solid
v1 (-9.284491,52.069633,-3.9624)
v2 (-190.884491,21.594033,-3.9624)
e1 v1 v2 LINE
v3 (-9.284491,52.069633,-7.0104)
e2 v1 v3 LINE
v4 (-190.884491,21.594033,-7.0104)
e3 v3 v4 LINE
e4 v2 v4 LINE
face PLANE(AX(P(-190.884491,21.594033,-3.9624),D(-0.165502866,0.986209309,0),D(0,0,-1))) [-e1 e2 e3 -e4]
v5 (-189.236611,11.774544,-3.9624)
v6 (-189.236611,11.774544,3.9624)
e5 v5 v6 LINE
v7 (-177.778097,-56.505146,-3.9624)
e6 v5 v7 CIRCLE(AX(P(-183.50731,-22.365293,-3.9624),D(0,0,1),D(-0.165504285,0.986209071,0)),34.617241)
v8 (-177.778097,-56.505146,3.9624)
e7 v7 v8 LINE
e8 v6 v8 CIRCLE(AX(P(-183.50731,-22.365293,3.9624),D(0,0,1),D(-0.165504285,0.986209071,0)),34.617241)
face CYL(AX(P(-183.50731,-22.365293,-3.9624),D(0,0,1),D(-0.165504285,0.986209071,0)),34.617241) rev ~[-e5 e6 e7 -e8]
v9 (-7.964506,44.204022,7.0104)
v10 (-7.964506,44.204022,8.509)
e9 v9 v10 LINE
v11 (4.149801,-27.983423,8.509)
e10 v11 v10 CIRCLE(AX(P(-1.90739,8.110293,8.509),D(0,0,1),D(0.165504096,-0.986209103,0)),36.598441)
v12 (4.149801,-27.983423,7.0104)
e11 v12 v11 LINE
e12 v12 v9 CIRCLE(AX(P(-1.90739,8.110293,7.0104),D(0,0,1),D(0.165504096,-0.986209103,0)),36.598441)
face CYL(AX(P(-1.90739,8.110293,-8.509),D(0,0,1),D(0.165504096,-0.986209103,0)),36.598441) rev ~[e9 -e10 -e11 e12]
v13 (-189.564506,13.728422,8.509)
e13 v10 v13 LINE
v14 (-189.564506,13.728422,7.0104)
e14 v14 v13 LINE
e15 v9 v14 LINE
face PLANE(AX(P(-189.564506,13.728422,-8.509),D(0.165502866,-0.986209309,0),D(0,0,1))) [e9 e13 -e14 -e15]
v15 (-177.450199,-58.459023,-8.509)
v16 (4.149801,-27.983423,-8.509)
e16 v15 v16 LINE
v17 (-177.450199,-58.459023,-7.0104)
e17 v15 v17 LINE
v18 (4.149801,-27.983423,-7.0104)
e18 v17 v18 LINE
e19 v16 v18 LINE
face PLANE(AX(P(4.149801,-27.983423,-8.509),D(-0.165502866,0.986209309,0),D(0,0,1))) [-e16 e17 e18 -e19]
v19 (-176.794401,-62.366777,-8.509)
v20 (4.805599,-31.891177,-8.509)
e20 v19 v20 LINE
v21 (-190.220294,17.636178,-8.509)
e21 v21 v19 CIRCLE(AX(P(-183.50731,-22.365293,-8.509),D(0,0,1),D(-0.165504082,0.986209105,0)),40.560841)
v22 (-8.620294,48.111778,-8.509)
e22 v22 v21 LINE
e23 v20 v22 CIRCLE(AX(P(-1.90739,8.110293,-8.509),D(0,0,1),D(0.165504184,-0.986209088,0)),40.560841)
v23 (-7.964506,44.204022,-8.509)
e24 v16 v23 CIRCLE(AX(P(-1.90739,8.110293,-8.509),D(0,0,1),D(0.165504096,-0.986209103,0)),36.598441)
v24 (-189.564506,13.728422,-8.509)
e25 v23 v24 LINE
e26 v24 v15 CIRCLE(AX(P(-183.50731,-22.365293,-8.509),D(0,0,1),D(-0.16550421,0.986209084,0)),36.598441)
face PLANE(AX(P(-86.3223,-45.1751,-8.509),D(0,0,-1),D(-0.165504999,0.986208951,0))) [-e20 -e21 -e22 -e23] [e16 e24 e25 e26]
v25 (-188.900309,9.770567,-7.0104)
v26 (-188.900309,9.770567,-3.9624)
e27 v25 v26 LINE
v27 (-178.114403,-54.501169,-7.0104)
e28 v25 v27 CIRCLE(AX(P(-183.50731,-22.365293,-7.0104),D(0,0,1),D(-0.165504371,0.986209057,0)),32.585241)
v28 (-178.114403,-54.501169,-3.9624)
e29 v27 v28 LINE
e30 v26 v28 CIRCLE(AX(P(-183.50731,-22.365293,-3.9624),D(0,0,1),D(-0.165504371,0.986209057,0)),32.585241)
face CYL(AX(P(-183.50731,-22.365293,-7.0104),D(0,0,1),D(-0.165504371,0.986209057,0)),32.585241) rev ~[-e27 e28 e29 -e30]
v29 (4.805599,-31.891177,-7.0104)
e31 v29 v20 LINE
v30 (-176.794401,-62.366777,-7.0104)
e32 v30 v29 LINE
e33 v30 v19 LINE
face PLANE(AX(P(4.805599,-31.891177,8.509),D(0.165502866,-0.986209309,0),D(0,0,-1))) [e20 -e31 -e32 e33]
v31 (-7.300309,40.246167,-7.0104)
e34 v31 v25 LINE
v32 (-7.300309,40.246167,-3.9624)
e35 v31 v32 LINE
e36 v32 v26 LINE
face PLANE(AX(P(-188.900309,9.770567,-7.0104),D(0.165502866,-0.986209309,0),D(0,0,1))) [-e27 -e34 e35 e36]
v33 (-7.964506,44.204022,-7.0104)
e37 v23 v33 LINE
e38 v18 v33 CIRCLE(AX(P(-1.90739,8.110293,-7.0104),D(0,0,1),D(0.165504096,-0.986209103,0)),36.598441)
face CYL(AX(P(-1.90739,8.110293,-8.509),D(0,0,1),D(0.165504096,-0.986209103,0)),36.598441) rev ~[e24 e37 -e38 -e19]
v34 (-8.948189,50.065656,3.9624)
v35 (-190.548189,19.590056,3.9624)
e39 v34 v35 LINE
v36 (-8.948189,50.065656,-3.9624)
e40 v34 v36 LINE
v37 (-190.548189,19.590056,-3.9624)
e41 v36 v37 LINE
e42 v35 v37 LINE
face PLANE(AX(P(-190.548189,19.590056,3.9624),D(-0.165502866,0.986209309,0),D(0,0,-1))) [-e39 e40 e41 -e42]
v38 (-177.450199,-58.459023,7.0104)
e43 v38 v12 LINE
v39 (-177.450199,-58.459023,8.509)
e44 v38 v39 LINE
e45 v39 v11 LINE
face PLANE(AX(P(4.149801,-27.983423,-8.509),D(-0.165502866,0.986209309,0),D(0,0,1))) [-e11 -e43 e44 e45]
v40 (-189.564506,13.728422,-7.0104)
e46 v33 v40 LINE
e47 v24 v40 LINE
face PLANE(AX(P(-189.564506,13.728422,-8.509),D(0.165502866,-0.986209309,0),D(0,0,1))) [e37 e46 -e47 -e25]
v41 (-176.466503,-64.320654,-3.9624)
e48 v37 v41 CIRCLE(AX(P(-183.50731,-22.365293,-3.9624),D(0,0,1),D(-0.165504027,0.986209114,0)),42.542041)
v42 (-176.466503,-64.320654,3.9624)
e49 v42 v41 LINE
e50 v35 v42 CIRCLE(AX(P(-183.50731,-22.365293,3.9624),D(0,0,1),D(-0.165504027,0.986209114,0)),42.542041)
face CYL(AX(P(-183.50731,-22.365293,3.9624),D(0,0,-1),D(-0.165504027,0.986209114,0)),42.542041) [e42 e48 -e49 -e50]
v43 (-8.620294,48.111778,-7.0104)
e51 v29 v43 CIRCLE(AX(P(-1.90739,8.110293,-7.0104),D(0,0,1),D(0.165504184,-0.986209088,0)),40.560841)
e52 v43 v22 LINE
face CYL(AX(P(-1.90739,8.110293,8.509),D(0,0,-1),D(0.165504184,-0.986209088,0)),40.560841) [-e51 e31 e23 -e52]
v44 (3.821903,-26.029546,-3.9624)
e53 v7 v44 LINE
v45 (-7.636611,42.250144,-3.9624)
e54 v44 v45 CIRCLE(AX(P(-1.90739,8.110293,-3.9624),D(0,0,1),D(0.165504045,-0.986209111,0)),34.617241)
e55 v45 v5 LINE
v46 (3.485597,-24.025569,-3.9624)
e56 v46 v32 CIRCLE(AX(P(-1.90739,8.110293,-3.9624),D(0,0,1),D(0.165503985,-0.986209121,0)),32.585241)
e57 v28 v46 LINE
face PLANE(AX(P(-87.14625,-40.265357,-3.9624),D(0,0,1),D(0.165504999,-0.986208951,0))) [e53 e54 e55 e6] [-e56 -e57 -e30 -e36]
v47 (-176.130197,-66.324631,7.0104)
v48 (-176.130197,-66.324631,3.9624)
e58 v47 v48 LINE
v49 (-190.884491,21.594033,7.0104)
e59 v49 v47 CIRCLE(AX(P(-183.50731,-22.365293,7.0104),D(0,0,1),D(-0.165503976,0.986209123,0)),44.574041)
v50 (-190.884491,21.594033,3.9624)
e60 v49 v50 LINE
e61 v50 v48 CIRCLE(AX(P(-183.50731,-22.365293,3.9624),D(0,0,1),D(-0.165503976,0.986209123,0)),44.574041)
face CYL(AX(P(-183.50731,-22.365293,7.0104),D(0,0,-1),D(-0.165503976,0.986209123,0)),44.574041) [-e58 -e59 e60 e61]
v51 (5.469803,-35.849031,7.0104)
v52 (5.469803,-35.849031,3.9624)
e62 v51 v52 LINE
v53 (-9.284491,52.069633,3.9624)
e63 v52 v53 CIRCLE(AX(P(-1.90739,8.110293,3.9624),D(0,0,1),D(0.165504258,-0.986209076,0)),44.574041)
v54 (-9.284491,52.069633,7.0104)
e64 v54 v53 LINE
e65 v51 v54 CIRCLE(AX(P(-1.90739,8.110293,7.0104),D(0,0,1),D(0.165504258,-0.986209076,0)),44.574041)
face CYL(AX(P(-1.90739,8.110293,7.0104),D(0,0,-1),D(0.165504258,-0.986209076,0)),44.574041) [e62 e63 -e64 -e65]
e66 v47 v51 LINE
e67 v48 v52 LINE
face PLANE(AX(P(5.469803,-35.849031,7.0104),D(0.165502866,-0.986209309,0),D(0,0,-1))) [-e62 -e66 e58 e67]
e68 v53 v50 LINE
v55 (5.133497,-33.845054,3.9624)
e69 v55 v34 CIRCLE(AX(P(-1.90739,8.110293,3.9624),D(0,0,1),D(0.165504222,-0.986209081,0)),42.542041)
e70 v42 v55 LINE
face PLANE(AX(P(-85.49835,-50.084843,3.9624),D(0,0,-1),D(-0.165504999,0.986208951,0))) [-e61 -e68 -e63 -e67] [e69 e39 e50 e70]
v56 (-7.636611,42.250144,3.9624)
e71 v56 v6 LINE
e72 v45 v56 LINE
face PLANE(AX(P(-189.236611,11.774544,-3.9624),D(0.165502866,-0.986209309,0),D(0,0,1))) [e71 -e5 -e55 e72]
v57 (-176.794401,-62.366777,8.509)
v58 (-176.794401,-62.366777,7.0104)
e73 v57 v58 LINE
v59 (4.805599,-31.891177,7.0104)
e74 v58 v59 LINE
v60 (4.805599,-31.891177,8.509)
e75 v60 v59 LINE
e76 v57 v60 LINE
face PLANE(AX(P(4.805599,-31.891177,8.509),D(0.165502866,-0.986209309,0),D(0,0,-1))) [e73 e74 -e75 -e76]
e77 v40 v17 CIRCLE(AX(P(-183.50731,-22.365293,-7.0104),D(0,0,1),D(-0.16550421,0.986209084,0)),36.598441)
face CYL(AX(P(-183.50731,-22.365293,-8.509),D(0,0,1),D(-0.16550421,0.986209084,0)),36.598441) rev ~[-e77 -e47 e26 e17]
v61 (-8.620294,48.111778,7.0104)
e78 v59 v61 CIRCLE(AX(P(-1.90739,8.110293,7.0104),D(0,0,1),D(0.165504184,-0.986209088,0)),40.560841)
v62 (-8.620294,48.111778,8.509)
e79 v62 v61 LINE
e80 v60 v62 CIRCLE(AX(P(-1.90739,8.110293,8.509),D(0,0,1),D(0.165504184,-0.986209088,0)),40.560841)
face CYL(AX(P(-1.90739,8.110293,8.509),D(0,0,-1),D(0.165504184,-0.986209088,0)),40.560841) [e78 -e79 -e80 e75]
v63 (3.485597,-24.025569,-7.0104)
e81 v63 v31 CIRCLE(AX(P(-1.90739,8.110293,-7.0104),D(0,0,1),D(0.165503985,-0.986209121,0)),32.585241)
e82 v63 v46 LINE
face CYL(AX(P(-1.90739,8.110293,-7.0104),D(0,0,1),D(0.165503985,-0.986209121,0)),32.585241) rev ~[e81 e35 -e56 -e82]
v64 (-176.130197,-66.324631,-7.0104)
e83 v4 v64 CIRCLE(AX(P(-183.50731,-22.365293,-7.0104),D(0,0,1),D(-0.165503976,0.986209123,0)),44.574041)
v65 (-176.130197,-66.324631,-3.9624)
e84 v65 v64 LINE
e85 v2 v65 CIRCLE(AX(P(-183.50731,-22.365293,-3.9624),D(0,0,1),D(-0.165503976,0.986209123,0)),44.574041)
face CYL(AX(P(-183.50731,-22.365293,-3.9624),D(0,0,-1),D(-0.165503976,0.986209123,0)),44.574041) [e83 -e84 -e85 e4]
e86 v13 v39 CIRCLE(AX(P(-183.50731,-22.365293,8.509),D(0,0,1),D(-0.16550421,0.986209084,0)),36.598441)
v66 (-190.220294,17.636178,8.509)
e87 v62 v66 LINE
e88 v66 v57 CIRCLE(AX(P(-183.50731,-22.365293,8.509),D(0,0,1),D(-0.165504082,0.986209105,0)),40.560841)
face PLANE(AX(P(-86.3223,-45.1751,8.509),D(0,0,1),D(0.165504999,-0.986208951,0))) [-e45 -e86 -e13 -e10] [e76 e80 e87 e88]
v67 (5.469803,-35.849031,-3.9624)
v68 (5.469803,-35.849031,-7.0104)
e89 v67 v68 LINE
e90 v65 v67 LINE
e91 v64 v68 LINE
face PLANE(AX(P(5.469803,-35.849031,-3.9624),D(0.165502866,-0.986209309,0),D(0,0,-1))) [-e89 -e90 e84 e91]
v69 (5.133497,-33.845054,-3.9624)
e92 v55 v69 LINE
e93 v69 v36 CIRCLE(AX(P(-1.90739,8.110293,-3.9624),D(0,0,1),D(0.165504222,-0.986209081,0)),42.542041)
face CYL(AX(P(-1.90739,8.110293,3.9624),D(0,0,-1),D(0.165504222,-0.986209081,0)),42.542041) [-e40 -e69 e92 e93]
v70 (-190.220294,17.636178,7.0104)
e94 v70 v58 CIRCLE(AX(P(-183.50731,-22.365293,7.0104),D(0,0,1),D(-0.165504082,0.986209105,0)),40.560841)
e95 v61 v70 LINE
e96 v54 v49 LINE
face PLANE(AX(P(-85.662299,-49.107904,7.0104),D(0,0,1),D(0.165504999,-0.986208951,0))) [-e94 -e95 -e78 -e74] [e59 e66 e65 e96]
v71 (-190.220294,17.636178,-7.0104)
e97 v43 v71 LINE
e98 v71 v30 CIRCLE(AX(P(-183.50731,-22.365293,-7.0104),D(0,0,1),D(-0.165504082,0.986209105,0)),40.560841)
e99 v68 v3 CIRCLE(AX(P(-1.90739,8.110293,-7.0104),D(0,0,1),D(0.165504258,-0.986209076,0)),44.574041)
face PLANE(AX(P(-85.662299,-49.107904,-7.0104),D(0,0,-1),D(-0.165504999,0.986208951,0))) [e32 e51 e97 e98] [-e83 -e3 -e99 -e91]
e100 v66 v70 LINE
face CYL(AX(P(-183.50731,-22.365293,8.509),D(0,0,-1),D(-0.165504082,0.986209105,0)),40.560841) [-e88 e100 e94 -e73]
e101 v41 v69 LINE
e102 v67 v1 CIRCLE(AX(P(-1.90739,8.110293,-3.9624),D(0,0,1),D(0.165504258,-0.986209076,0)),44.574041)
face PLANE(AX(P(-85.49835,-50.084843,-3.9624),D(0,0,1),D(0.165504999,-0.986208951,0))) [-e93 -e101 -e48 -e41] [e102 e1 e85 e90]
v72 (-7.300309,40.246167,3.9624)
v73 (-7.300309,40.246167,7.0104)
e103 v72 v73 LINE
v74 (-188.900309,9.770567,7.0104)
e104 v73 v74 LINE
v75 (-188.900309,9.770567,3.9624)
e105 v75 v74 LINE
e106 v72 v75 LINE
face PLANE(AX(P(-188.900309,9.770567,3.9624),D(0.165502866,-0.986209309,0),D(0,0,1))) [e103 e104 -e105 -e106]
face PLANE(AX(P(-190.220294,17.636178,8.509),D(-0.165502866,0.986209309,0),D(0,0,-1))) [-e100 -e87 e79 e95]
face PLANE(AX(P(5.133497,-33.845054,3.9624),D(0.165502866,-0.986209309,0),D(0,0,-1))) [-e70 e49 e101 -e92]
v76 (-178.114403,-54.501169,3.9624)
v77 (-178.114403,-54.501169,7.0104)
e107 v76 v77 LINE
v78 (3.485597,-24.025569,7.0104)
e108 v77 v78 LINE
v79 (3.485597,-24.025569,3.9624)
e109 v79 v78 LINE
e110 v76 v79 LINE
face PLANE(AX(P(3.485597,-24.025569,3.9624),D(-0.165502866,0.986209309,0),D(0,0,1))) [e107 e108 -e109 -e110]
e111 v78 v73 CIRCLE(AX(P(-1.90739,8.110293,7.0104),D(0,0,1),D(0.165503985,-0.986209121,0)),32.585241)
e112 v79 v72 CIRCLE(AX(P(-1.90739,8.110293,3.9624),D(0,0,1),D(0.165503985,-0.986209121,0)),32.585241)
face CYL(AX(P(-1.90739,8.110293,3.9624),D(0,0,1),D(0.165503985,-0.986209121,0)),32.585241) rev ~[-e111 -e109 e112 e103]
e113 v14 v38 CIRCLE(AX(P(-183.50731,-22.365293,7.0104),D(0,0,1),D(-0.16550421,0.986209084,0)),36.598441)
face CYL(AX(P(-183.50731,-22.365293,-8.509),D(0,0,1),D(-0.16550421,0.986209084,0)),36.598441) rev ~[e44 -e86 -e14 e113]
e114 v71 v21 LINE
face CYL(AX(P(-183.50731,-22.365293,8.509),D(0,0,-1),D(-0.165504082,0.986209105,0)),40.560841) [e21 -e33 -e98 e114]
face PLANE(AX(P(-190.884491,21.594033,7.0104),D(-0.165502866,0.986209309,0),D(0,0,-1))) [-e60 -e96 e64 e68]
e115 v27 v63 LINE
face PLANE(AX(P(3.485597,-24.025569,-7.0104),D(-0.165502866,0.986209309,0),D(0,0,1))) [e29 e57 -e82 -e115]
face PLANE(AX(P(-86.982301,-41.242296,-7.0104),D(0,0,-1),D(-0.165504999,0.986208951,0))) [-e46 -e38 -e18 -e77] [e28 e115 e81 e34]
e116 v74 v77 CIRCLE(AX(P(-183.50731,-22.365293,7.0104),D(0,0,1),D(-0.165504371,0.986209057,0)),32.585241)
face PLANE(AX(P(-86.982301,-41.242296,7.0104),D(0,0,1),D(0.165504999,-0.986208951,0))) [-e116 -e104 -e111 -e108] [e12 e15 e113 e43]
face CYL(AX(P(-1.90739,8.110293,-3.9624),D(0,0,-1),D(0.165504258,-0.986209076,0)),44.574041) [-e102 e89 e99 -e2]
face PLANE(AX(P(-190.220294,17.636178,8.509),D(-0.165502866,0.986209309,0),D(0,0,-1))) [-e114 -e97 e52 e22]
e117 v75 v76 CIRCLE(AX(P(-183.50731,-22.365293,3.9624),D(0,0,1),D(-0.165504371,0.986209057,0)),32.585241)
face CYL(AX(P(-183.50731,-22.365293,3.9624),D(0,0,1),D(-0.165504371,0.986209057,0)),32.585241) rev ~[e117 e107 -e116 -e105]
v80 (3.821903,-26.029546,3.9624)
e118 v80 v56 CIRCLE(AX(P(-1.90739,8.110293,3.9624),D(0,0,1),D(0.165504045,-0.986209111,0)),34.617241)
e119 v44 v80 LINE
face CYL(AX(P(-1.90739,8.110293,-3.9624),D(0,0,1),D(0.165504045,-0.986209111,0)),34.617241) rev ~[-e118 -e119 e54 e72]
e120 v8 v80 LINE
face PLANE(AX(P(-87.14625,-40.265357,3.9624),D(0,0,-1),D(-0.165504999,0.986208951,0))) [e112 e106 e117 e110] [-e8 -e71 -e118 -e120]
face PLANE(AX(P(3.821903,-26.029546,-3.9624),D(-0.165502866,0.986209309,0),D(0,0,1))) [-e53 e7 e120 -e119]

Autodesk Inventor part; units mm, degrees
ref_plane "Work Plane2" through (-1.9074, 8.1103, 0) normal (-1, 0, 0) x (0, 0, 1)
ref_plane "Work Plane3" through (-183.5073, -22.3653, 0) normal (1, 0, 0) x (0, 0, 1)
sketch "Path" plane through (0, 0, 0) normal (0, 0, 1) x (1, 0, 0)
  arc A0 (4.4777, -29.9373) -> (-8.2924, 46.1579) centre (-1.9074, 8.1103) ccw
  arc A1 (-189.8924, 15.6823) -> (-177.1223, -60.4129) centre (-183.5073, -22.3653) ccw
  line L0 (-189.8924, 15.6823) -> (-8.2924, 46.1579)
  line L1 (4.4777, -29.9373) -> (-177.1223, -60.4129)
  dimension "d31" = 11.9888
ref_plane "Section Plane" through (-8.2924, 46.1579, 0) normal (-0.9862093, -0.1655029, 0) x (0, 0, 1)
sketch "Section Sketch" plane through (-8.2924, 46.1579, 0) normal (-0.9862093, -0.1655029, 0) x (0, 0, 1)
  line L0 (-8.509, -1.9812) -> (8.509, -1.9812)
  line L1 (8.509, -1.9812) -> (8.509, 1.9812)
  line L2 (8.509, 1.9812) -> (-8.509, 1.9812)
  line L3 (-8.509, 1.9812) -> (-8.509, -1.9812)
  line L4 (-3.9624, -3.9624) -> (3.9624, -3.9624)
  line L5 (3.9624, -3.9624) -> (3.9624, 3.9624)
  line L6 (3.9624, 3.9624) -> (-3.9624, 3.9624)
  line L7 (-3.9624, 3.9624) -> (-3.9624, -3.9624)
  line L8 (-3.9624, 0) -> (3.9624, 0) construction
  line L9 (-7.0104, -5.9944) -> (-3.9624, -5.9944)
  line L10 (-3.9624, -5.9944) -> (-3.9624, 5.9944)
  line L11 (-3.9624, 5.9944) -> (-7.0104, 5.9944)
  line L12 (-7.0104, 5.9944) -> (-7.0104, -5.9944)
  line L13 (3.9624, -5.9944) -> (7.0104, -5.9944)
  line L14 (7.0104, -5.9944) -> (7.0104, 5.9944)
  line L15 (7.0104, 5.9944) -> (3.9624, 5.9944)
  line L16 (3.9624, 5.9944) -> (3.9624, -5.9944)
  line L17 (-8.509, 0) -> (8.509, 0) construction
  point P0 (0, 0)
  point P1 (0, 0)
  dimension "d21" = 3.9624
  dimension "d22" = 7.9248
  dimension "d23" = 7.9248
  dimension "d24" = 3.048
  dimension "d31" = 11.9888
  dimension "d32" = 17.018
sweep "Solid" add profiles "Section Sketch" path "Path"
pattern_of_one "Strand Pattern"
equation "\"d21\" = da_d2"
equation "\"d22\" = da_d1"
equation "\"d23\" = da_b1"
equation "\"d24\" = da_t1 + da_t2"
equation "\"d30\" = da_pt"
equation "\"da_p\" = 12.7"
equation "\"da_b1\" = 7.9248"
equation "\"da_h2\" = 11.9888"
equation "\"da_h3\" = 10.3886"
equation "\"da_d1\" = 7.9248"
equation "\"da_d2\" = 3.9624"
equation "\"da_pt\" = 14.3764"
equation "\"da_b\" = 17.018"
equation "\"da_t1\" = 1.524"
equation "\"da_t2\" = 1.524"
properties part number "Roller Chain"
